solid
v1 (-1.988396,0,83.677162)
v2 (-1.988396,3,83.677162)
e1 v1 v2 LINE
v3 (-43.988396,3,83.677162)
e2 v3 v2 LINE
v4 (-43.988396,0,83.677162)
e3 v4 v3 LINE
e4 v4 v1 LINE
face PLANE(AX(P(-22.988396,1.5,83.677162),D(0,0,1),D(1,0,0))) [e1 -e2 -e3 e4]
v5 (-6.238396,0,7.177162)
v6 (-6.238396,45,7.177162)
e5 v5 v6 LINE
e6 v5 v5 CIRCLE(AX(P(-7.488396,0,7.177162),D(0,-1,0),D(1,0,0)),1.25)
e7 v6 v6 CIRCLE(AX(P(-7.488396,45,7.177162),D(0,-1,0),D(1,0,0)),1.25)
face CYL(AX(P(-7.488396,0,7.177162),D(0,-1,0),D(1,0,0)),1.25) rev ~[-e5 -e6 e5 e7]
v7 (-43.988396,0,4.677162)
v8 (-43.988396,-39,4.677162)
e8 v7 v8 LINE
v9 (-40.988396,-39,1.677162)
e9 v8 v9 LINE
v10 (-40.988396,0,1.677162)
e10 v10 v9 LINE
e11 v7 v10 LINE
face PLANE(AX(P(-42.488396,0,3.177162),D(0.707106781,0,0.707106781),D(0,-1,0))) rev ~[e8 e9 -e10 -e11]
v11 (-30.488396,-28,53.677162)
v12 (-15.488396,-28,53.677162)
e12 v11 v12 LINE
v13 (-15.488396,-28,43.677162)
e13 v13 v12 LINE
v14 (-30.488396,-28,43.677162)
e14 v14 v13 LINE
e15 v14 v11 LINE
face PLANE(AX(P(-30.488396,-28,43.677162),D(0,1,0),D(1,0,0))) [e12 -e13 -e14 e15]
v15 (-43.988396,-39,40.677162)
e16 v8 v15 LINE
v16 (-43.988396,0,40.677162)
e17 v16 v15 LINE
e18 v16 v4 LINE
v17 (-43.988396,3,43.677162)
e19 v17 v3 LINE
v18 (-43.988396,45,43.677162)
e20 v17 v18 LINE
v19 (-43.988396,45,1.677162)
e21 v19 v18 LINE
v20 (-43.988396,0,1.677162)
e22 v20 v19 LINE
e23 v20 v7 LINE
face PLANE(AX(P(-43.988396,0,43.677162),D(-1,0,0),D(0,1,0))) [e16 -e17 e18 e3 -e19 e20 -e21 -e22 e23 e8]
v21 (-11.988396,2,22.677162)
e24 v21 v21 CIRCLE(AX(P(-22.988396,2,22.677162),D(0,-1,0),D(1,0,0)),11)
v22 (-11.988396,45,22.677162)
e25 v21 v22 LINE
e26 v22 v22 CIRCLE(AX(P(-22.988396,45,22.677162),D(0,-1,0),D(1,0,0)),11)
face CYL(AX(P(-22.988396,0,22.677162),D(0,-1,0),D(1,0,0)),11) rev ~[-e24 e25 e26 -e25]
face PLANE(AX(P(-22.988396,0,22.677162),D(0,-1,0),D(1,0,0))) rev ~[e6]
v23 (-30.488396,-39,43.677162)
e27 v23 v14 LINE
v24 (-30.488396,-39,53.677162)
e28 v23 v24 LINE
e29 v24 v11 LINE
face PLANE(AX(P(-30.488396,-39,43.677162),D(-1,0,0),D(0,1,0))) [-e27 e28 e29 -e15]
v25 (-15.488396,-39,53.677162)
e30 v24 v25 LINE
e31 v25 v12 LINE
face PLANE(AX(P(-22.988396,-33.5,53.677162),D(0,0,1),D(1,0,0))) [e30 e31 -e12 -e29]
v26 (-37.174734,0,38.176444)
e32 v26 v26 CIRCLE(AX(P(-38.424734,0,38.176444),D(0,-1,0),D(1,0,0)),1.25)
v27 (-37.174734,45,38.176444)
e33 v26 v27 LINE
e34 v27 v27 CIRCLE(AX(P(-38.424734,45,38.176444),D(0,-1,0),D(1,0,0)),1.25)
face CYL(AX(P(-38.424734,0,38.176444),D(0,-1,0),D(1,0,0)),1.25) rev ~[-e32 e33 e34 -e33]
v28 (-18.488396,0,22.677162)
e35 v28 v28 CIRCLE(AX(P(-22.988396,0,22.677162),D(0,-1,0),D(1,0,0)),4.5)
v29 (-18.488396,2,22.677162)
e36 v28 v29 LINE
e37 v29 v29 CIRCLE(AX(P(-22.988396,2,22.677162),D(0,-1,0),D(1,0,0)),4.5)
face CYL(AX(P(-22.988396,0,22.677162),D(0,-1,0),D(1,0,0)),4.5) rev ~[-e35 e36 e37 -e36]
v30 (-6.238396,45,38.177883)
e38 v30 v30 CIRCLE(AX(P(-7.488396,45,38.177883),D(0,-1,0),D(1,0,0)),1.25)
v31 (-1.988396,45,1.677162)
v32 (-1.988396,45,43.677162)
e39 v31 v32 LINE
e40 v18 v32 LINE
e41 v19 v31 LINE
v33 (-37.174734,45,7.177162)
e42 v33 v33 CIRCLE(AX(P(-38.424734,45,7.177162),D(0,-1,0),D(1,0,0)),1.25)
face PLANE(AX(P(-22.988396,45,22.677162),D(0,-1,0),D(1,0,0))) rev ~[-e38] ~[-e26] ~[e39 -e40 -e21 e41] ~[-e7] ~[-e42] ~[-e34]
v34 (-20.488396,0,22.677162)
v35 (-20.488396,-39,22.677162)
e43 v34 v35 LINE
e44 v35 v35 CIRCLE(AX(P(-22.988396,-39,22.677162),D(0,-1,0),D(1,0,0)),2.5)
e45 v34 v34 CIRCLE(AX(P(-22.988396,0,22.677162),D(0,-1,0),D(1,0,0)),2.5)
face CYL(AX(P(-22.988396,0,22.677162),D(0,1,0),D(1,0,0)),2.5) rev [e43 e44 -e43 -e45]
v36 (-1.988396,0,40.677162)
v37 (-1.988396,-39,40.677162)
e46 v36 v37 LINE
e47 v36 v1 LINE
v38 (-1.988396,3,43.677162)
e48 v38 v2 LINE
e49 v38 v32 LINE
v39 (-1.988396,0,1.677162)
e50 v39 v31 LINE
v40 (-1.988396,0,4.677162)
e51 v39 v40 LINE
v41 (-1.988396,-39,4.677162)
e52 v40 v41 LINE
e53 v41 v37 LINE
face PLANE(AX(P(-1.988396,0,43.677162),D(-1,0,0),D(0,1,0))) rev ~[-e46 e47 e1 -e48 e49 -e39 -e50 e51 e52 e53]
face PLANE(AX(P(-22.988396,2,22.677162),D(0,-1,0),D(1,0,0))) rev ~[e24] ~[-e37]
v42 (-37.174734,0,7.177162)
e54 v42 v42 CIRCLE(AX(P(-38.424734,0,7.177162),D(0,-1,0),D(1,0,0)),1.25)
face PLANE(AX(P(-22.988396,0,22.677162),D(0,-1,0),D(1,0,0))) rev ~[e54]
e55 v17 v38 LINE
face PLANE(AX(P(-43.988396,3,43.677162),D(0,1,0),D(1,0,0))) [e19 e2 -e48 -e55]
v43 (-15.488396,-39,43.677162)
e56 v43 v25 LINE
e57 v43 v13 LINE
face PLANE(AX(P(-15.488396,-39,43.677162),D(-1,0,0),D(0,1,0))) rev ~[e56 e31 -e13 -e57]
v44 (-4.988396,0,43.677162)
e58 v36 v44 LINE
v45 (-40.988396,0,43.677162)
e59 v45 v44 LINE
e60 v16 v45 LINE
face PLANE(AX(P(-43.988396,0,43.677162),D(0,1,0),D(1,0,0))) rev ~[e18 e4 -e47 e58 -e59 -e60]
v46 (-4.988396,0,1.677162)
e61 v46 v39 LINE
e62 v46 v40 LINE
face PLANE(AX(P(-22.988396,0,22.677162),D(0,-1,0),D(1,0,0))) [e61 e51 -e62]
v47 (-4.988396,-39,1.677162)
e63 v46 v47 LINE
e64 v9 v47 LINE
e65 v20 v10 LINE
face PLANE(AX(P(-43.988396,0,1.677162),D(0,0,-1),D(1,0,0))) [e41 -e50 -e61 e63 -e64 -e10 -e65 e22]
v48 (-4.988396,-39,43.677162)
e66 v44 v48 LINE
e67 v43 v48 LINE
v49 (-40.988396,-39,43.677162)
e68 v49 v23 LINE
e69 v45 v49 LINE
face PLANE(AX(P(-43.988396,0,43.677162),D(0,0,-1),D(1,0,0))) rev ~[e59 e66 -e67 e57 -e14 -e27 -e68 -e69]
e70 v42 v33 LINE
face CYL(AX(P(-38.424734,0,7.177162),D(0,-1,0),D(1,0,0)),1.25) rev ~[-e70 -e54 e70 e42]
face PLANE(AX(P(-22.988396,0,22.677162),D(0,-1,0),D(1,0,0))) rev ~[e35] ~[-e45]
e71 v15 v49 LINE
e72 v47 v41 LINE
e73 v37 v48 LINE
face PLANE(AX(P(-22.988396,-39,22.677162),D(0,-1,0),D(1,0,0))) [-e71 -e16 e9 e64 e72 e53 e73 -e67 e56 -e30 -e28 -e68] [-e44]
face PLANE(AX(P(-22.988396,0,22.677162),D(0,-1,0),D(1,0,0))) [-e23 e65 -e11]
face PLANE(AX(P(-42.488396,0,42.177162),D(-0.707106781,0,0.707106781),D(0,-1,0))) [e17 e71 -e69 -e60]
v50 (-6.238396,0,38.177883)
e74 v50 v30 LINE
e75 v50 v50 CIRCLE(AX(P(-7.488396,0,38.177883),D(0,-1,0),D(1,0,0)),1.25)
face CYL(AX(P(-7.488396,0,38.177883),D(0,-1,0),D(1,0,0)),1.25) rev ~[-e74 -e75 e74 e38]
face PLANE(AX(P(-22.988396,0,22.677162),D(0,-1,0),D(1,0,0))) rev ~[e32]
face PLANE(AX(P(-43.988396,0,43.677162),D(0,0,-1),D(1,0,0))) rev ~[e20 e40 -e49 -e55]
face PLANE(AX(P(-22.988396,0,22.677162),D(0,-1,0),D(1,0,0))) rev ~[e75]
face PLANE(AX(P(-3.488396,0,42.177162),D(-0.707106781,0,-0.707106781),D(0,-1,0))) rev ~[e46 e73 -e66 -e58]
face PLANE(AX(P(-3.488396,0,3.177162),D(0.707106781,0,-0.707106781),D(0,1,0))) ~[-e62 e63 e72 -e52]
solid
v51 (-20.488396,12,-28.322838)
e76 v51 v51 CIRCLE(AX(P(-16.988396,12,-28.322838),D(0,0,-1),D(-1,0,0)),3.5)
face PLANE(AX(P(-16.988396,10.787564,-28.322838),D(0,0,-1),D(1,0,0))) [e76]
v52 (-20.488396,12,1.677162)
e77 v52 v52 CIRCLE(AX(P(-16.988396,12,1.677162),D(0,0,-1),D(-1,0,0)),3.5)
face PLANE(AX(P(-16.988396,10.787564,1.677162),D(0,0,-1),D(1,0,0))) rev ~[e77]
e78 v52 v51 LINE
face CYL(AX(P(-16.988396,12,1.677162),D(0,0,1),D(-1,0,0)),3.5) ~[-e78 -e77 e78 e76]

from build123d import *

# Parameters (mm, degrees)
F0_W      = 42
F0_H      = 42
F0_R      = 1.25
F0_R_2    = 11
F0_R_3    = 4.5
F0_R_4    = 2.5
F1_DEPTH  = 39
F2_SIZE   = 3
F3_DEPTH  = 2
F5_W      = 15
F5_H      = 11
F6_DEPTH  = 10
F7_DEPTH  = 45
F8_W      = 42
F8_H      = 3
F9_DEPTH  = 40
F11_DEPTH = 30


# Not quite as in the source:
# - the program builds the solid bodies; features that only make, move or delete a surface that nothing else refers to are left out


with BuildPart() as f1:
    # F0 (on Front) → F1 (new body)
    with BuildSketch(Plane.XZ):
        with Locations((-22.9883964362, 22.6771618161)):
            Rectangle(F0_W, F0_H)
        with Locations((-38.4247341791, 7.1771618161)):
            Circle(F0_R, mode=Mode.SUBTRACT)
        with Locations((-7.4883964362, 7.1771618161)):
            Circle(F0_R, mode=Mode.SUBTRACT)
        with Locations((-38.4247341791, 38.1764436699)):
            Circle(F0_R, mode=Mode.SUBTRACT)
        with Locations((-22.9883964362, 22.6771618161)):
            Circle(F0_R_2, mode=Mode.SUBTRACT)
        with Locations((-7.4883964362, 38.1778829577)):
            Circle(F0_R, mode=Mode.SUBTRACT)
        with Locations((-22.9883964362, 22.6771618161)):
            Circle(F0_R_2)
        with Locations((-22.9883964362, 22.6771618161)):
            Circle(F0_R_3, mode=Mode.SUBTRACT)
        with Locations((-22.9883964362, 22.6771618161)):
            Circle(F0_R_3)
        with Locations((-22.9883964362, 22.6771618161)):
            Circle(F0_R_4, mode=Mode.SUBTRACT)
        with Locations((-38.4247341791, 38.1764436699)):
            Circle(F0_R)
        with Locations((-7.4883964362, 7.1771618161)):
            Circle(F0_R)
        with Locations((-38.4247341791, 7.1771618161)):
            Circle(F0_R)
        with Locations((-7.4883964362, 38.1778829577)):
            Circle(F0_R)
    extrude(amount=F1_DEPTH)

    # F2
    f2_edges = [f1.edges().sort_by_distance(p)[0] for p in [
        (-43.988396, -19.5, 1.677162),
        (-1.988396, -19.5, 1.677162),
        (-1.988396, -19.5, 43.677162),
        (-43.988396, -19.5, 43.677162),
    ]]
    chamfer(f2_edges, length=F2_SIZE)

    # F0 (on Front) → F3 (join)
    with BuildSketch(Plane.XZ):
        with Locations((-22.9883964362, 22.6771618161)):
            Circle(F0_R_2)
        with Locations((-22.9883964362, 22.6771618161)):
            Circle(F0_R_3, mode=Mode.SUBTRACT)
    extrude(amount=-F3_DEPTH)

    # F5 (on face) → F6 (join)
    with BuildSketch(Plane.XY.offset(43.6771618161)):
        with Locations((-22.9883964362, -33.5)):
            Rectangle(F5_W, F5_H)
    extrude(amount=F6_DEPTH)

    # F0 (on Front) → F7 (join)
    with BuildSketch(Plane.XZ):
        with Locations((-22.9883964362, 22.6771618161)):
            Rectangle(F0_W, F0_H)
        with Locations((-38.4247341791, 7.1771618161)):
            Circle(F0_R, mode=Mode.SUBTRACT)
        with Locations((-7.4883964362, 7.1771618161)):
            Circle(F0_R, mode=Mode.SUBTRACT)
        with Locations((-38.4247341791, 38.1764436699)):
            Circle(F0_R, mode=Mode.SUBTRACT)
        with Locations((-22.9883964362, 22.6771618161)):
            Circle(F0_R_2, mode=Mode.SUBTRACT)
        with Locations((-7.4883964362, 38.1778829577)):
            Circle(F0_R, mode=Mode.SUBTRACT)
    extrude(amount=-F7_DEPTH)

    # F8 (on face) → F9 (join)
    with BuildSketch(Plane.XY.offset(43.6771618161)):
        with Locations((-22.9883964362, 1.5)):
            Rectangle(F8_W, F8_H)
    extrude(amount=F9_DEPTH)


with BuildPart() as f11:
    # F10 (on face) → F11 (new body)
    with BuildSketch(Plane(origin=(0, 0, 1.6771618161), x_dir=(1, 0, 0), z_dir=(0, 0, -1))):
        with BuildLine():
            Line((-20.4883964362, -12), (-13.4883964362, -12))
            ThreePointArc((-13.4883964362, -12), (-16.9883964362, -8.5), (-20.4883964362, -12))
        make_face()
        with BuildLine():
            ThreePointArc((-20.4883964362, -12), (-16.9883964362, -15.5), (-13.4883964362, -12))
            Line((-13.4883964362, -12), (-20.4883964362, -12))
        make_face()
    extrude(amount=F11_DEPTH)


solid = Compound([f1.part, f11.part])
